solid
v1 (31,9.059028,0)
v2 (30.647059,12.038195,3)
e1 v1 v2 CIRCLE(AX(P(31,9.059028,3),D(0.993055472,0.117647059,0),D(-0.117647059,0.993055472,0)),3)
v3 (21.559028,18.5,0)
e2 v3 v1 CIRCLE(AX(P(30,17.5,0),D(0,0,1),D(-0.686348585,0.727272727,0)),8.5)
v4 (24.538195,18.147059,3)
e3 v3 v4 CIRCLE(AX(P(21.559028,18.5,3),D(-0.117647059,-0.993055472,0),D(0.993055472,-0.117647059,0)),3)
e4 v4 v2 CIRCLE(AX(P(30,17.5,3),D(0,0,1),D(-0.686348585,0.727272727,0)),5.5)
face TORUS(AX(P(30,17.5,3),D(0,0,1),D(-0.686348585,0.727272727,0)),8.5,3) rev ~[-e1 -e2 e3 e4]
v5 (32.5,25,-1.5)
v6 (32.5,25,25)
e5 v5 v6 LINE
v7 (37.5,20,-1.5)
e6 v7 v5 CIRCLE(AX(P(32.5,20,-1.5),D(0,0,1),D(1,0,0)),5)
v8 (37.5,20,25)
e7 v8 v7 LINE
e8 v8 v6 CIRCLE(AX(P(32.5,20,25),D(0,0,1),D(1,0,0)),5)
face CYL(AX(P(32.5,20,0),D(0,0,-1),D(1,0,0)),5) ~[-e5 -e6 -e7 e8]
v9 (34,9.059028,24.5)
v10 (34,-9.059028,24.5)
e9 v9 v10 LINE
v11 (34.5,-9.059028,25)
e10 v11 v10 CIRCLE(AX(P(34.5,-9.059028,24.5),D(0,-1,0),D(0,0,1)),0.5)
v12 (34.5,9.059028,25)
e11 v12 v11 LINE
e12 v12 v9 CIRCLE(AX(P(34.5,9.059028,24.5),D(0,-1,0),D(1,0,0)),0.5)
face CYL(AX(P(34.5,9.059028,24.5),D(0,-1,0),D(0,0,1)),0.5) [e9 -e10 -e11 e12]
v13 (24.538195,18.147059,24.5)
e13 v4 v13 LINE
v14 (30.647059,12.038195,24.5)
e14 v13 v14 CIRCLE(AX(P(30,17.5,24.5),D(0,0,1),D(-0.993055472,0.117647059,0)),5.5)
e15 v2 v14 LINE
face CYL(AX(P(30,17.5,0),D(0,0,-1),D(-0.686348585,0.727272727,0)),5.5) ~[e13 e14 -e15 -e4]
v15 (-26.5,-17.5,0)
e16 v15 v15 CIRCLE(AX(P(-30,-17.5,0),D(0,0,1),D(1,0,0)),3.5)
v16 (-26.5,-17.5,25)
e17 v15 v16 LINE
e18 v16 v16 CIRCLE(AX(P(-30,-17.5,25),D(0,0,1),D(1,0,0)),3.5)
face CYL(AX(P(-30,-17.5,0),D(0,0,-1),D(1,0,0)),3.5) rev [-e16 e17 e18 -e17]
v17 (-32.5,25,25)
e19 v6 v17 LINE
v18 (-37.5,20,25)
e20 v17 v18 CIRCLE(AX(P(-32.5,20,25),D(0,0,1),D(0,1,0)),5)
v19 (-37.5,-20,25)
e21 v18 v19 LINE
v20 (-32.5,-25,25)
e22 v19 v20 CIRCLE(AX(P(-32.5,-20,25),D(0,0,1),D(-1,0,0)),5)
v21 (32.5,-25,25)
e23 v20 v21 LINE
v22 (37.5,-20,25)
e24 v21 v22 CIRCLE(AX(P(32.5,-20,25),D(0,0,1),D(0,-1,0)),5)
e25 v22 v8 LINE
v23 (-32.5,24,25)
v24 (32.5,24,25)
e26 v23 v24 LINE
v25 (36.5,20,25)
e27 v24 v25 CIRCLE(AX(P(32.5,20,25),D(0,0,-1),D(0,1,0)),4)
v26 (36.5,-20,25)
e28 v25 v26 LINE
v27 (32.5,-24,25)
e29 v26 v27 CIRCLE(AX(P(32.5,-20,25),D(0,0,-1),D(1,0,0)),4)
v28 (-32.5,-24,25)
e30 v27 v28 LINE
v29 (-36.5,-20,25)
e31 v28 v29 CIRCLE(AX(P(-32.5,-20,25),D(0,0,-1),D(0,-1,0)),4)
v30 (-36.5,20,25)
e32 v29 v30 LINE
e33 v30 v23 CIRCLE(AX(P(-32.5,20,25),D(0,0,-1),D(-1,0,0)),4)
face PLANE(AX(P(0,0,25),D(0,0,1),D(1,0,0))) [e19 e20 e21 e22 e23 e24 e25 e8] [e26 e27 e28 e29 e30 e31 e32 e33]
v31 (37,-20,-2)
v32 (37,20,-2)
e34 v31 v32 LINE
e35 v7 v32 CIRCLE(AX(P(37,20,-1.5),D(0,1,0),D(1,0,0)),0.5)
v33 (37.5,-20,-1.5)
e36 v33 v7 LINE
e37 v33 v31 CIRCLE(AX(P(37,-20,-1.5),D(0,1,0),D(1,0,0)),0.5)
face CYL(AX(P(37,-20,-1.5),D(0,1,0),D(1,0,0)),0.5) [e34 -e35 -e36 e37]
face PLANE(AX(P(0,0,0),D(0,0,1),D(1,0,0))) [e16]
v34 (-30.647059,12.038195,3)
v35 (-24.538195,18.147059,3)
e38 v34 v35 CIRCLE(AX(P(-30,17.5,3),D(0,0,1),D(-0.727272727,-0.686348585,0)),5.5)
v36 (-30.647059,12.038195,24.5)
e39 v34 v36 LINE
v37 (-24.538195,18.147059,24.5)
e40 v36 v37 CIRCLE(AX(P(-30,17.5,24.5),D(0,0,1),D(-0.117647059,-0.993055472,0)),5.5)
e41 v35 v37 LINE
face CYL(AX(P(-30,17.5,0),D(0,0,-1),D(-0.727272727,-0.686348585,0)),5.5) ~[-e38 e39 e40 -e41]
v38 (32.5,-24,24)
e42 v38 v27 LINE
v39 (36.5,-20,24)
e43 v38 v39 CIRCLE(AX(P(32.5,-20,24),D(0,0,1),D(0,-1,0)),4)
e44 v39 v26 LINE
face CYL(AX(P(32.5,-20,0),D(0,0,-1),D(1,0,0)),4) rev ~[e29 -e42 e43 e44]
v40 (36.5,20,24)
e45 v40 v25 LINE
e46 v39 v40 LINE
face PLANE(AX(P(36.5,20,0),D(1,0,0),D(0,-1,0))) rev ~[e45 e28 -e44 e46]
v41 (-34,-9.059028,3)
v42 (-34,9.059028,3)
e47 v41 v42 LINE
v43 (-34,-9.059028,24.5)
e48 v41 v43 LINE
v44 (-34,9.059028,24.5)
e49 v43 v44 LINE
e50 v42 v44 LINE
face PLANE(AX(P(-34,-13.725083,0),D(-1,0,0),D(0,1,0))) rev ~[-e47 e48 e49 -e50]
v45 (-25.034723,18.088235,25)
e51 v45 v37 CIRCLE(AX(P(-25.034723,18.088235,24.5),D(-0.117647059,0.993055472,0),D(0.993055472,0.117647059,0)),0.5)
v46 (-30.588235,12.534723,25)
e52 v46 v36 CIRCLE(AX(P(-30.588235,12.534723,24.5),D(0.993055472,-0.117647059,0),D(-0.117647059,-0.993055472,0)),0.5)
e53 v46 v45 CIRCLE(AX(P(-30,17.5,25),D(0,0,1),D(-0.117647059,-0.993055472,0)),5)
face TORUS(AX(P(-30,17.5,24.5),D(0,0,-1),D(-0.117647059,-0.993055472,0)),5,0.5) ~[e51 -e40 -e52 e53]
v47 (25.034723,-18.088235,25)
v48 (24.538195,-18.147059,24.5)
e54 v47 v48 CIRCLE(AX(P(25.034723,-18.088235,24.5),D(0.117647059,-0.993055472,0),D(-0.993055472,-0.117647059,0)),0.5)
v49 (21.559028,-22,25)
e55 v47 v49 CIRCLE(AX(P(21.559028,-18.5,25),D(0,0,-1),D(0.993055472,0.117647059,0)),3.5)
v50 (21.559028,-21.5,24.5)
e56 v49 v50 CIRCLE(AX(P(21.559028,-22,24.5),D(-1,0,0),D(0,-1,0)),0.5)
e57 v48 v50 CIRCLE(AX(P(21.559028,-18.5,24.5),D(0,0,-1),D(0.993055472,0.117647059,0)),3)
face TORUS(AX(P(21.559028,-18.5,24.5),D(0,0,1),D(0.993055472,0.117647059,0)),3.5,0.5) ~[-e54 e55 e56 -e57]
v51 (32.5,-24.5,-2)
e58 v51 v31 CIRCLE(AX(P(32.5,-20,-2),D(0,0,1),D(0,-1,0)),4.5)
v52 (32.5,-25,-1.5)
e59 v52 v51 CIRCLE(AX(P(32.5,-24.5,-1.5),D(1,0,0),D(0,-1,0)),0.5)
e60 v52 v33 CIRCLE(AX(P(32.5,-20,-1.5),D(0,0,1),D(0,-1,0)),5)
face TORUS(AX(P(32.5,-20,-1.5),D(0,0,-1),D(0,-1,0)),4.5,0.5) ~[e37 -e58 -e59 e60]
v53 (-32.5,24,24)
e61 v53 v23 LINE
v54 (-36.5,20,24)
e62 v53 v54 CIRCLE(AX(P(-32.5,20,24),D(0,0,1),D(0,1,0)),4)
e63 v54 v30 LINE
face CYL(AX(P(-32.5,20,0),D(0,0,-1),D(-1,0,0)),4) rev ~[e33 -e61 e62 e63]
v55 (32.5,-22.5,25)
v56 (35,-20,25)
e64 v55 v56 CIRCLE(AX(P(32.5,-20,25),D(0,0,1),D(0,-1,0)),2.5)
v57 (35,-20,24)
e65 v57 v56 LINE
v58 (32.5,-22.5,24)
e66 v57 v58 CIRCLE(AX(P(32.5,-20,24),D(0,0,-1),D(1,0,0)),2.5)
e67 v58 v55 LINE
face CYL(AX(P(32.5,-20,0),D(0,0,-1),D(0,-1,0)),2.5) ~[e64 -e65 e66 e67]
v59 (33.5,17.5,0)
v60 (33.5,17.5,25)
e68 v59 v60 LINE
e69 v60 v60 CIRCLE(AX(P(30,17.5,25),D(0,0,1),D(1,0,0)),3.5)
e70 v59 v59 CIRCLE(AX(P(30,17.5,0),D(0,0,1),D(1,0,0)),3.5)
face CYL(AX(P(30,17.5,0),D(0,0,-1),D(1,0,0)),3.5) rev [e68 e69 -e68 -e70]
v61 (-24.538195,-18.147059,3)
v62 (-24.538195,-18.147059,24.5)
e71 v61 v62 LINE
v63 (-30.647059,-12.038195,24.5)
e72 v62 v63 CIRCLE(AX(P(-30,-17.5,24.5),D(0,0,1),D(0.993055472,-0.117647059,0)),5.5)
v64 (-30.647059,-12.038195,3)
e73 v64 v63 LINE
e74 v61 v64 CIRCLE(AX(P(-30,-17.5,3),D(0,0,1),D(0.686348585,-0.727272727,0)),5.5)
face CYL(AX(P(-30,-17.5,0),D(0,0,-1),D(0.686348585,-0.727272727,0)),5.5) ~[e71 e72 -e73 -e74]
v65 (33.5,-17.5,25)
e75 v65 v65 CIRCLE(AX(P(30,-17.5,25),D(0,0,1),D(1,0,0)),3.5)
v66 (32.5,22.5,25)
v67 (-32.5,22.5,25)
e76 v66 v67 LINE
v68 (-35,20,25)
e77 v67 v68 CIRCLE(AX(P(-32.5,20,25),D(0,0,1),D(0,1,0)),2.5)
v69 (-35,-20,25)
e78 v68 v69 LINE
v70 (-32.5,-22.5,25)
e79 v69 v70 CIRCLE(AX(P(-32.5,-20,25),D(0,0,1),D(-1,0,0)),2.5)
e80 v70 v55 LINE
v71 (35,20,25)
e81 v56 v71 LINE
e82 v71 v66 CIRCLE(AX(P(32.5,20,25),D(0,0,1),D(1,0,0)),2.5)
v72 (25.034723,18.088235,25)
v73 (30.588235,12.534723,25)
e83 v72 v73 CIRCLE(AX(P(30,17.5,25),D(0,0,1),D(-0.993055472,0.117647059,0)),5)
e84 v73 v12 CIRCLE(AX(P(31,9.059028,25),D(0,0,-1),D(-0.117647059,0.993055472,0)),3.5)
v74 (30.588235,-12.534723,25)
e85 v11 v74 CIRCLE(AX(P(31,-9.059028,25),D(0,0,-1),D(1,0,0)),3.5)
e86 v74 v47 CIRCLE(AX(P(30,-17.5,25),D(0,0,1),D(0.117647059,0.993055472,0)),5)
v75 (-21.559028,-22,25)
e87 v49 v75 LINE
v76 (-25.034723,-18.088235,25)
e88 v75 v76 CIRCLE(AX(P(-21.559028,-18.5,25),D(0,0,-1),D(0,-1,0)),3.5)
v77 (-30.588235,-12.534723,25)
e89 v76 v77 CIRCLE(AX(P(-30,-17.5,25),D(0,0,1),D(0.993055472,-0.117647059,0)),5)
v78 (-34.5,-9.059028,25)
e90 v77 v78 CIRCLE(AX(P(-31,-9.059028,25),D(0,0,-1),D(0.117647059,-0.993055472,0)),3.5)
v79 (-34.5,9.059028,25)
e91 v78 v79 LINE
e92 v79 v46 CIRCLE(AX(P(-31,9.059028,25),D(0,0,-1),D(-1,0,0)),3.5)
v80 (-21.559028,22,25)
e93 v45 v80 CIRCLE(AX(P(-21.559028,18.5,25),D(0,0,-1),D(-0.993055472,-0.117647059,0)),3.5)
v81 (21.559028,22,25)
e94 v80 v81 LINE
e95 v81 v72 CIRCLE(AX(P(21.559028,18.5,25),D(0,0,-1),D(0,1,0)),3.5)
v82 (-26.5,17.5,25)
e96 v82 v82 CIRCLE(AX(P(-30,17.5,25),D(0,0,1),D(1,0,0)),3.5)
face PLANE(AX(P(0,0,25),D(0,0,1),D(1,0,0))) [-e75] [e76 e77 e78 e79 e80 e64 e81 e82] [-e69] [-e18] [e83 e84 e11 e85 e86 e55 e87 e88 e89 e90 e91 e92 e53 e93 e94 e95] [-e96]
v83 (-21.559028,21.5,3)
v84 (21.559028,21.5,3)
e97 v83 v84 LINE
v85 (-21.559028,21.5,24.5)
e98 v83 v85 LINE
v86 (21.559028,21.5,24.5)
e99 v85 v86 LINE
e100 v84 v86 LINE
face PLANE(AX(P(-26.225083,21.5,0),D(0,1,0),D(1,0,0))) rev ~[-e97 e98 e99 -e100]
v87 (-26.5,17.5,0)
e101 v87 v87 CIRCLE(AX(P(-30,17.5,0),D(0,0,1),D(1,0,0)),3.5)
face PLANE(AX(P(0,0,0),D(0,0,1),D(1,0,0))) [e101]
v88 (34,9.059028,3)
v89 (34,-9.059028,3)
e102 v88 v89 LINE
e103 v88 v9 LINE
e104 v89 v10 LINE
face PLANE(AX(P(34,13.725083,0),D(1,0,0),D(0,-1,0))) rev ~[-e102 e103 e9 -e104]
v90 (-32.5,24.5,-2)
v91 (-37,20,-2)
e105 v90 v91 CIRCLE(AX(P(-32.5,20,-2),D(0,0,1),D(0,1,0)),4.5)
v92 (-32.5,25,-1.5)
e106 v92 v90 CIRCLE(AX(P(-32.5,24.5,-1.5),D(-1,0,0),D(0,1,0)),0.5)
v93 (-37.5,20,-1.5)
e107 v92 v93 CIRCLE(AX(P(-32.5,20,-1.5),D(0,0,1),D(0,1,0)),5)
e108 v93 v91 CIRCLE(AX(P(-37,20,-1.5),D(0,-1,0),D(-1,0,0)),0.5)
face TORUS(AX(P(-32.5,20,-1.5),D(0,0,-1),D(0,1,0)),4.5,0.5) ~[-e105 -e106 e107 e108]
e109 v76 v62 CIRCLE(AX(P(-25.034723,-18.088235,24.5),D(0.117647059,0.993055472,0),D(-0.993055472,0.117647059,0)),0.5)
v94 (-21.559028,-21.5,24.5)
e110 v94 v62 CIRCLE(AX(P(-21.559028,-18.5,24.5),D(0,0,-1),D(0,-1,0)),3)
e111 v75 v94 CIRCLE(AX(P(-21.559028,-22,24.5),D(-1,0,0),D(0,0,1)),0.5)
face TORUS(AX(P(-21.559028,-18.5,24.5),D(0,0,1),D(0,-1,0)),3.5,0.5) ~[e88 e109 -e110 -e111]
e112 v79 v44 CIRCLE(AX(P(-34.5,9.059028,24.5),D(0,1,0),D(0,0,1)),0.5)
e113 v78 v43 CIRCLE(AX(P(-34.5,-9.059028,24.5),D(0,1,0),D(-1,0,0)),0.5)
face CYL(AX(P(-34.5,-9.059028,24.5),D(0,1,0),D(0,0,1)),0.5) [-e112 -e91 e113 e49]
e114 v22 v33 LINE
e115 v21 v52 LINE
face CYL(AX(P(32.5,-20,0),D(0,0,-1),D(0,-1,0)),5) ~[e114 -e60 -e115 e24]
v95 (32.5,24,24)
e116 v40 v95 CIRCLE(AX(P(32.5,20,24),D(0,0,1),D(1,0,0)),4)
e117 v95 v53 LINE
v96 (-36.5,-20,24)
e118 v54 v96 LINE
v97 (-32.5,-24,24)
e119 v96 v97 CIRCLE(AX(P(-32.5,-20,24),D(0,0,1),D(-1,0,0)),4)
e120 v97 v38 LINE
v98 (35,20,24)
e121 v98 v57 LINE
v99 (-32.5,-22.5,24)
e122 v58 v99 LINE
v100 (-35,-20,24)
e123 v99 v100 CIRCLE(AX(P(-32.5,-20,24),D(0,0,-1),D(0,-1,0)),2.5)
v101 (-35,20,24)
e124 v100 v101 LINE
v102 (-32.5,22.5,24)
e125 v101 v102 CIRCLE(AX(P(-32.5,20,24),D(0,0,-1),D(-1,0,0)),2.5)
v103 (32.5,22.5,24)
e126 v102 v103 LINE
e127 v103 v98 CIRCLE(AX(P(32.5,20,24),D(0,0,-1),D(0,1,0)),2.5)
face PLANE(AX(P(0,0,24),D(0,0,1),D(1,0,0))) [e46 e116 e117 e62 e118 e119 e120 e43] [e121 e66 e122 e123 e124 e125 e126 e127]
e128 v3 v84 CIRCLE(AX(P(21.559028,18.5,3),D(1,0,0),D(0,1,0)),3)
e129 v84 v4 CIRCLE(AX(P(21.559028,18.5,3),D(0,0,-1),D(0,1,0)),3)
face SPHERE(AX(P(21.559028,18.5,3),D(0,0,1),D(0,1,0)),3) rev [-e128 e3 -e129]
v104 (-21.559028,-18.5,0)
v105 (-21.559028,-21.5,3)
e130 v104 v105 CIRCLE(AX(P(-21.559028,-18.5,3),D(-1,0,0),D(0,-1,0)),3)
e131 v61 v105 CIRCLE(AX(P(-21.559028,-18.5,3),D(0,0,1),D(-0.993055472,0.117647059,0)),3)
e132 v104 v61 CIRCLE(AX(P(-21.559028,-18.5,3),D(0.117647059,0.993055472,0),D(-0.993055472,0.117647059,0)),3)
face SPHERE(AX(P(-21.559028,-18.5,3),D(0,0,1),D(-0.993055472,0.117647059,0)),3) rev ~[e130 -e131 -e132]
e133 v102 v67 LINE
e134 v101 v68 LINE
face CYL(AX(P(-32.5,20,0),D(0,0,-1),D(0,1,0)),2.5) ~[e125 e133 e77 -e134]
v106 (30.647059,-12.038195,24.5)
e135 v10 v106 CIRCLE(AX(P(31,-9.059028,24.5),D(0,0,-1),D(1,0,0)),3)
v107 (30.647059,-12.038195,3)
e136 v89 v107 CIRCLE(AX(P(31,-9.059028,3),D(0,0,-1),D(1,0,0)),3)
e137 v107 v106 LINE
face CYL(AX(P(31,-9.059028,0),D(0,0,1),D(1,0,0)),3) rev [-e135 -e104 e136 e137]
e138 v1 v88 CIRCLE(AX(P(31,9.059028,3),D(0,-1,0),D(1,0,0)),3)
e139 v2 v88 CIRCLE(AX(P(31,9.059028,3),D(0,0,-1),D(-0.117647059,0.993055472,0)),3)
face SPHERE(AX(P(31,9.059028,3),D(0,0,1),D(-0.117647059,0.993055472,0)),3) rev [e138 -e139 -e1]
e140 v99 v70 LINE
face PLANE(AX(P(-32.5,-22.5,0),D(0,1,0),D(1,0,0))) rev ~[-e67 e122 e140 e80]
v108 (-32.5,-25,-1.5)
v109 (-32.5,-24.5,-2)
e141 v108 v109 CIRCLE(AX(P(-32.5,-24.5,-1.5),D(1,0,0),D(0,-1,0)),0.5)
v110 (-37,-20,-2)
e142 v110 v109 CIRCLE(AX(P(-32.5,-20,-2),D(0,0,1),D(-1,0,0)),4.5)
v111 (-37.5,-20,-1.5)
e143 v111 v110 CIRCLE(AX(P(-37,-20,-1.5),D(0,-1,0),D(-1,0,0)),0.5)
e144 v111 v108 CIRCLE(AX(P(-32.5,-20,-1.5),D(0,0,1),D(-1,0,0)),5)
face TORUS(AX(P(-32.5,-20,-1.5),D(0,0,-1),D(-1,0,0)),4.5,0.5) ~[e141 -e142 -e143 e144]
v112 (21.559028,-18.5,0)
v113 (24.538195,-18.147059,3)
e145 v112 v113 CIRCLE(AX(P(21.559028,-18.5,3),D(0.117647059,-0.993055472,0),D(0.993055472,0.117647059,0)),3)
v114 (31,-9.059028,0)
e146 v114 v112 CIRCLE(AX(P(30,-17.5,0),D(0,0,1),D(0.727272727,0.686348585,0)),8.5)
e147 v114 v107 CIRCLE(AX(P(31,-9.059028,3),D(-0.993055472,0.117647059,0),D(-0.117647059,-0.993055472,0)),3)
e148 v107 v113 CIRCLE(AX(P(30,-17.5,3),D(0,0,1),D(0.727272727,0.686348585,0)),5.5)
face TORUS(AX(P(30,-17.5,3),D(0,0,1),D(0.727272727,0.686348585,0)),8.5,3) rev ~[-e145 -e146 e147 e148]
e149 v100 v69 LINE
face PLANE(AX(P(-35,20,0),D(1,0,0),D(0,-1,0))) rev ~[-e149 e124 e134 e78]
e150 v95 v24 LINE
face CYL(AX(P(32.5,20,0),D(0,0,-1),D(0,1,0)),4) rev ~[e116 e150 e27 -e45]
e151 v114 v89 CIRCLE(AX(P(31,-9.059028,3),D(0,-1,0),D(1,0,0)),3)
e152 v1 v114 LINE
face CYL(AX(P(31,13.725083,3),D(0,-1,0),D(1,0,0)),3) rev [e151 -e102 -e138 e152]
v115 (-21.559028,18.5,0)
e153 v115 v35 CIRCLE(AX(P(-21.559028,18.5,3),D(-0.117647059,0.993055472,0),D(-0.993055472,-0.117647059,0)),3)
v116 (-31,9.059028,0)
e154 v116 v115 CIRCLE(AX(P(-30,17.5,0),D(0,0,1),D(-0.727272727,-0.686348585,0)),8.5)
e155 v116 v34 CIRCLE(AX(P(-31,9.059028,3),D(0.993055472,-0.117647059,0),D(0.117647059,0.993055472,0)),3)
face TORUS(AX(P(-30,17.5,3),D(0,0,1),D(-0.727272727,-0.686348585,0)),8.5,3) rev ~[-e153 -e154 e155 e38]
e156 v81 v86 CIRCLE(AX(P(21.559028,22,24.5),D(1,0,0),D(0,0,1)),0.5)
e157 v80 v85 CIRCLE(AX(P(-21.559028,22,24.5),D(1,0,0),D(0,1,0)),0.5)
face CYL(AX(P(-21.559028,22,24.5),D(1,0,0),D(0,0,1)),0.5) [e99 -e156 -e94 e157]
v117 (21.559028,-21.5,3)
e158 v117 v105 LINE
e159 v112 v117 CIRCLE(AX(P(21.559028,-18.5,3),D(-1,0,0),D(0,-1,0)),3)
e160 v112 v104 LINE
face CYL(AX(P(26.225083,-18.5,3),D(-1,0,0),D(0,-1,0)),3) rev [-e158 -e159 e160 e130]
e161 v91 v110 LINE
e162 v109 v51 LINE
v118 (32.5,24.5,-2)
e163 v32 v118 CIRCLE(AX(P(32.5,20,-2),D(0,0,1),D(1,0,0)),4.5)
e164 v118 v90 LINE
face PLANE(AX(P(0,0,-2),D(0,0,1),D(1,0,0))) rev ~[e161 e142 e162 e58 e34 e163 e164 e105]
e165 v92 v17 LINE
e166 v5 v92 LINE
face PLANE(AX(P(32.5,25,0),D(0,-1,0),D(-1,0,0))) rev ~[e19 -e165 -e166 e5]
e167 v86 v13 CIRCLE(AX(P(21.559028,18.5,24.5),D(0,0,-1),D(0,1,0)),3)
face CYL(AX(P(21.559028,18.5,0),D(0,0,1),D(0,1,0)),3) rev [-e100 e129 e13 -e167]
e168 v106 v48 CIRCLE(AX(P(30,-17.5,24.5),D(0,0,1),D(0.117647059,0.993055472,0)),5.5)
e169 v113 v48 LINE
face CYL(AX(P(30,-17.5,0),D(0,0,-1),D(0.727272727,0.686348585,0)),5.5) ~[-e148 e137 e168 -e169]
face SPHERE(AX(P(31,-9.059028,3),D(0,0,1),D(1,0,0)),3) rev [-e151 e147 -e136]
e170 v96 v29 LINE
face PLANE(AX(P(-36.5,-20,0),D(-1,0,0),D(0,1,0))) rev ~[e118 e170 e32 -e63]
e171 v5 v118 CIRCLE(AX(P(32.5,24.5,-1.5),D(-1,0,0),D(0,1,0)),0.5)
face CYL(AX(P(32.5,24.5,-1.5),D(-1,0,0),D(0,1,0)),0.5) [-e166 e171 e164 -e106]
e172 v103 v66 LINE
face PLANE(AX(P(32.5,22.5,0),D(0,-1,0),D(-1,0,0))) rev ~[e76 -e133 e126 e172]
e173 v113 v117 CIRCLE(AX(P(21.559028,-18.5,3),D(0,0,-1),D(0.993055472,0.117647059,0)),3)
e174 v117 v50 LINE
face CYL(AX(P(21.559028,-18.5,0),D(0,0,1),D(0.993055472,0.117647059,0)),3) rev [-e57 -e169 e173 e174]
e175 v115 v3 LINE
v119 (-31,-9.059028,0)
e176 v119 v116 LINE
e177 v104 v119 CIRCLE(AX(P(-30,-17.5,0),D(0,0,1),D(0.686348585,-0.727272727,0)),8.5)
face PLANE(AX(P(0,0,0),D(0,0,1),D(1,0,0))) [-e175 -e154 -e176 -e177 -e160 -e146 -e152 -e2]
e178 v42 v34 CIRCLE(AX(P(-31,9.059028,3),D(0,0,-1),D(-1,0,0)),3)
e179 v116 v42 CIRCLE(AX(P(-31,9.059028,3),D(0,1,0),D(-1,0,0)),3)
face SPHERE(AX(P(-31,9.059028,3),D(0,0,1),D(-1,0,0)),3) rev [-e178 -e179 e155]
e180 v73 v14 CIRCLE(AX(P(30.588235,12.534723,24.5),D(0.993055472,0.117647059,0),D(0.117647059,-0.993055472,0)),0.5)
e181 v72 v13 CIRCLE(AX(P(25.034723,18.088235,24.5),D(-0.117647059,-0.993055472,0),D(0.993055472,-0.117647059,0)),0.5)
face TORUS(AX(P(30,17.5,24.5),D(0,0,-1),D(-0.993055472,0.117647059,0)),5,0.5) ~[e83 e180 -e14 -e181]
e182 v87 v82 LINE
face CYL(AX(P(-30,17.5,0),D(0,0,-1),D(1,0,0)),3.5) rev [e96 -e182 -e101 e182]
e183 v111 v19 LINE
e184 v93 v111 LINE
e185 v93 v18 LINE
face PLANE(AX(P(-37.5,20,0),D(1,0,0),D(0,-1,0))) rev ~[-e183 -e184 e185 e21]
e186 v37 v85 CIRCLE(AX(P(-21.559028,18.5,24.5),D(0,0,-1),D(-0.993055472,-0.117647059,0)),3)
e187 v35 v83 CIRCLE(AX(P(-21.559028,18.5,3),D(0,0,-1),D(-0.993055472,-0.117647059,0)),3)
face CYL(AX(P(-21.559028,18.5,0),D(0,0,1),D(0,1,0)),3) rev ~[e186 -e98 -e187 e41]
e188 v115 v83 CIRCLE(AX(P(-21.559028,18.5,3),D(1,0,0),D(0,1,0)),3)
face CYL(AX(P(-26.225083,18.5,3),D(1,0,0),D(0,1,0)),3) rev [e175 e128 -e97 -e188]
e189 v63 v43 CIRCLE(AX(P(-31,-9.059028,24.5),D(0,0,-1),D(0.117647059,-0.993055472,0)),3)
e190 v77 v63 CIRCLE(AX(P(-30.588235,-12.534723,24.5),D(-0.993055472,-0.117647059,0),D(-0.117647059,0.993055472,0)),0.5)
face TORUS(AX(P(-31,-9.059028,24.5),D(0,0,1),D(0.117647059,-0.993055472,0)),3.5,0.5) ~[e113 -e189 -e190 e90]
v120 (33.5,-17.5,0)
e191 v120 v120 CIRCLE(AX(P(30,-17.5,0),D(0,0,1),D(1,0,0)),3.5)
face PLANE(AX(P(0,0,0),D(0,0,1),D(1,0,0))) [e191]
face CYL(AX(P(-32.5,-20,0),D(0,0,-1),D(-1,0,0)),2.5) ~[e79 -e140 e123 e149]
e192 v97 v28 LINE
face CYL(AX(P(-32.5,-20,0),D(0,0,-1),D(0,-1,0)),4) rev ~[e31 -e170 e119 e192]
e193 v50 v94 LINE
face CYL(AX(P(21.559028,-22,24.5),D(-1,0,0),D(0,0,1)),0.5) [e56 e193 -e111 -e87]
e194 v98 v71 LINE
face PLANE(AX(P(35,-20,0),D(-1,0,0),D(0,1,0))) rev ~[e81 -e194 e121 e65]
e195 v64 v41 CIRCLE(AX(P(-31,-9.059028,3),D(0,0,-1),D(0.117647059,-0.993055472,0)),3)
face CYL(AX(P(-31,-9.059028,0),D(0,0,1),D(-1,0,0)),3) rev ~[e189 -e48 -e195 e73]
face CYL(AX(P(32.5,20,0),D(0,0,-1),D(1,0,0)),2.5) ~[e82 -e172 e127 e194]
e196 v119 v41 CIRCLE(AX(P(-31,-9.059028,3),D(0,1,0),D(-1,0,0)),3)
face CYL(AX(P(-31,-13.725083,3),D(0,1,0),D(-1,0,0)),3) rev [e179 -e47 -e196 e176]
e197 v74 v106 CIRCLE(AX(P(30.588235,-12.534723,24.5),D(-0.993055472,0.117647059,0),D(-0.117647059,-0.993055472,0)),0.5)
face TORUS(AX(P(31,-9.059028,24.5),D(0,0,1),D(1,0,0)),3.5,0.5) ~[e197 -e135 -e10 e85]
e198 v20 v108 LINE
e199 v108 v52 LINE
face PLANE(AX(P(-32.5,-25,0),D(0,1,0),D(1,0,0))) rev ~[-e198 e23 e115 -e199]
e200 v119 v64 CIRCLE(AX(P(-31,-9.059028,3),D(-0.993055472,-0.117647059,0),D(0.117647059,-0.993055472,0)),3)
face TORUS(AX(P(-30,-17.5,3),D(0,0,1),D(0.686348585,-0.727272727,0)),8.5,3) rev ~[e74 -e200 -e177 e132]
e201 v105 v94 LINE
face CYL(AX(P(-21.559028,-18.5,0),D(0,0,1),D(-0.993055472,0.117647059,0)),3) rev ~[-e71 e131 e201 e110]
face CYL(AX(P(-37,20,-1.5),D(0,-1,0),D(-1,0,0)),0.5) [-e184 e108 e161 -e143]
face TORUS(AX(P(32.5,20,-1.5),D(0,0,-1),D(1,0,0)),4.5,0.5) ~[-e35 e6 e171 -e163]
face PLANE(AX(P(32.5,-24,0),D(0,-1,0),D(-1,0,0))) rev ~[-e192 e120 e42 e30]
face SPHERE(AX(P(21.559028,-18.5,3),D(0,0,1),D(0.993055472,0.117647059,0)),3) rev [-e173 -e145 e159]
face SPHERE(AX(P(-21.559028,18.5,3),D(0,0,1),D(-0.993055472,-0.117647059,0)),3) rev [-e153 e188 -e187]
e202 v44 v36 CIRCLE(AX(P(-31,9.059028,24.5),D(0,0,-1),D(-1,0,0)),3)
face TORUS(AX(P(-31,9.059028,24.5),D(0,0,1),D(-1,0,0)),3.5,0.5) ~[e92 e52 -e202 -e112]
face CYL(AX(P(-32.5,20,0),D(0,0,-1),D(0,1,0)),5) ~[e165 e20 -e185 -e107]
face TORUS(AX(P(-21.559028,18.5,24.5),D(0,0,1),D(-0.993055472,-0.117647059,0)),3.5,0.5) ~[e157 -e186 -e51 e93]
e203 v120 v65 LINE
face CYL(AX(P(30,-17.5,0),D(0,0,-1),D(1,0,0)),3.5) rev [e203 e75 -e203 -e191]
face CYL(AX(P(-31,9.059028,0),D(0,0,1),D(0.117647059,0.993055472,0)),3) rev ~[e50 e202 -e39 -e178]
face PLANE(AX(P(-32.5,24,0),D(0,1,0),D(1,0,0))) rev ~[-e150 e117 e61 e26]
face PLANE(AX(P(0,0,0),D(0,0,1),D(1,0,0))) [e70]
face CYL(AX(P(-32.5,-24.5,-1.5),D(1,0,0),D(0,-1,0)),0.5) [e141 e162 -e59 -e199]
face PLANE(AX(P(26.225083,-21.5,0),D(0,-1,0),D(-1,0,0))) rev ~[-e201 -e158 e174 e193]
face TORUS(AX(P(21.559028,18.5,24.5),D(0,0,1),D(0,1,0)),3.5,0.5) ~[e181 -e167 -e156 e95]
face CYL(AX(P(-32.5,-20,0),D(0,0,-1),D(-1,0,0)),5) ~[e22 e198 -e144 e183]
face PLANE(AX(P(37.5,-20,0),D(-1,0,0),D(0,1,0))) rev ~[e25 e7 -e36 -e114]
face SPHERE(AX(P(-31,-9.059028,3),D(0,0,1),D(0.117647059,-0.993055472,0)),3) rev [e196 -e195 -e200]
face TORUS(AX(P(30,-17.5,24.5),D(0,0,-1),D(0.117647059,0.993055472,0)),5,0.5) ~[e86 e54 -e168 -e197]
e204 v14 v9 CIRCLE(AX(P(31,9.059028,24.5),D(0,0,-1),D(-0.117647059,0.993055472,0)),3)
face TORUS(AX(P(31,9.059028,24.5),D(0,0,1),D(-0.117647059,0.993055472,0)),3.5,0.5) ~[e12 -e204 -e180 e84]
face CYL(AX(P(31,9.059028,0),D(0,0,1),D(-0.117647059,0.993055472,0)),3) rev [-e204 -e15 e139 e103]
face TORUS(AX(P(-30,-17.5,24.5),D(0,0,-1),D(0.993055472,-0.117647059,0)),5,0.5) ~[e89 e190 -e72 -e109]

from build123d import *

# Parameters (mm, degrees)
F0_R     = 3.5
F1_DEPTH = 2
F2_DEPTH = 25
F3_DEPTH = 24
F4_R     = 3
F5_R     = 0.5
F6_R     = 0.5


with BuildPart() as f1:
    # F0 (on Top) → F1 (new body)
    with BuildSketch(Plane.XY):
        with BuildLine():
            ThreePointArc((37.5, 20), (36.0355339059, 23.5355339059), (32.5, 25))
            Line((32.5, 25), (-32.5, 25))
            ThreePointArc((-32.5, 25), (-36.0355339059, 23.5355339059), (-37.5, 20))
            Line((-37.5, 20), (-37.5, -20))
            ThreePointArc((-37.5, -20), (-36.0355339059, -23.5355339059), (-32.5, -25))
            Line((-32.5, -25), (32.5, -25))
            ThreePointArc((32.5, -25), (36.0355339059, -23.5355339059), (37.5, -20))
            Line((37.5, -20), (37.5, 20))
        make_face()
        with BuildLine():
            ThreePointArc((32.5, 24), (35.3284271247, 22.8284271247), (36.5, 20))
            Line((36.5, 20), (36.5, -20))
            ThreePointArc((36.5, -20), (35.3284271247, -22.8284271247), (32.5, -24))
            Line((32.5, -24), (-32.5, -24))
            ThreePointArc((-32.5, -24), (-35.3284271247, -22.8284271247), (-36.5, -20))
            Line((-36.5, -20), (-36.5, 20))
            ThreePointArc((-36.5, 20), (-35.3284271247, 22.8284271247), (-32.5, 24))
            Line((-32.5, 24), (32.5, 24))
        make_face(mode=Mode.SUBTRACT)
        with BuildLine():
            Line((36.5, -20), (36.5, 20))
            ThreePointArc((36.5, 20), (35.3284271247, 22.8284271247), (32.5, 24))
            Line((32.5, 24), (-32.5, 24))
            ThreePointArc((-32.5, 24), (-35.3284271247, 22.8284271247), (-36.5, 20))
            Line((-36.5, 20), (-36.5, -20))
            ThreePointArc((-36.5, -20), (-35.3284271247, -22.8284271247), (-32.5, -24))
            Line((-32.5, -24), (32.5, -24))
            ThreePointArc((32.5, -24), (35.3284271247, -22.8284271247), (36.5, -20))
        make_face()
        with BuildLine():
            ThreePointArc((32.5, 22.5), (34.267766953, 21.767766953), (35, 20))
            Line((35, 20), (35, -20))
            ThreePointArc((35, -20), (34.267766953, -21.767766953), (32.5, -22.5))
            Line((32.5, -22.5), (-32.5, -22.5))
            ThreePointArc((-32.5, -22.5), (-34.267766953, -21.767766953), (-35, -20))
            Line((-35, -20), (-35, 20))
            ThreePointArc((-35, 20), (-34.267766953, 21.767766953), (-32.5, 22.5))
            Line((-32.5, 22.5), (32.5, 22.5))
        make_face(mode=Mode.SUBTRACT)
        with BuildLine():
            Line((35, -20), (35, 20))
            ThreePointArc((35, 20), (34.267766953, 21.767766953), (32.5, 22.5))
            Line((32.5, 22.5), (-32.5, 22.5))
            ThreePointArc((-32.5, 22.5), (-34.267766953, 21.767766953), (-35, 20))
            Line((-35, 20), (-35, -20))
            ThreePointArc((-35, -20), (-34.267766953, -21.767766953), (-32.5, -22.5))
            Line((-32.5, -22.5), (32.5, -22.5))
            ThreePointArc((32.5, -22.5), (34.267766953, -21.767766953), (35, -20))
        make_face()
        with BuildLine():
            ThreePointArc((32.5, 21.5), (33.5606601718, 21.0606601718), (34, 20))
            Line((34, 20), (34, 13.7250827824))
            Line((34, 13.7250827824), (34, -13.7250827824))
            Line((34, -13.7250827824), (34, -20))
            ThreePointArc((34, -20), (33.5606601718, -21.0606601718), (32.5, -21.5))
            Line((32.5, -21.5), (26.2250827824, -21.5))
            Line((26.2250827824, -21.5), (-26.2250827824, -21.5))
            Line((-26.2250827824, -21.5), (-32.5, -21.5))
            ThreePointArc((-32.5, -21.5), (-33.5606601718, -21.0606601718), (-34, -20))
            Line((-34, -20), (-34, -13.7250827824))
            Line((-34, -13.7250827824), (-34, 13.7250827824))
            Line((-34, 13.7250827824), (-34, 20))
            ThreePointArc((-34, 20), (-33.5606601718, 21.0606601718), (-32.5, 21.5))
            Line((-32.5, 21.5), (-26.2250827824, 21.5))
            Line((-26.2250827824, 21.5), (26.2250827824, 21.5))
            Line((26.2250827824, 21.5), (32.5, 21.5))
        make_face(mode=Mode.SUBTRACT)
        with BuildLine():
            Line((34, -13.7250827824), (34, 13.7250827824))
            ThreePointArc((34, 13.7250827824), (26.1109127035, 13.6109127035), (26.2250827824, 21.5))
            Line((26.2250827824, 21.5), (-26.2250827824, 21.5))
            ThreePointArc((-26.2250827824, 21.5), (-26.1109127035, 13.6109127035), (-34, 13.7250827824))
            Line((-34, 13.7250827824), (-34, -13.7250827824))
            ThreePointArc((-34, -13.7250827824), (-26.1109127035, -13.6109127035), (-26.2250827824, -21.5))
            Line((-26.2250827824, -21.5), (26.2250827824, -21.5))
            ThreePointArc((26.2250827824, -21.5), (26.1109127035, -13.6109127035), (34, -13.7250827824))
        make_face()
        with BuildLine():
            Line((34, 13.7250827824), (34, 20))
            ThreePointArc((34, 20), (33.5606601718, 21.0606601718), (32.5, 21.5))
            Line((32.5, 21.5), (26.2250827824, 21.5))
            ThreePointArc((26.2250827824, 21.5), (26.1109127035, 13.6109127035), (34, 13.7250827824))
        make_face()
        with Locations((30, 17.5)):
            Circle(F0_R, mode=Mode.SUBTRACT)
        with BuildLine():
            Line((34, -20), (34, -13.7250827824))
            ThreePointArc((34, -13.7250827824), (26.1109127035, -13.6109127035), (26.2250827824, -21.5))
            Line((26.2250827824, -21.5), (32.5, -21.5))
            ThreePointArc((32.5, -21.5), (33.5606601718, -21.0606601718), (34, -20))
        make_face()
        with Locations((30, -17.5)):
            Circle(F0_R, mode=Mode.SUBTRACT)
        with BuildLine():
            Line((-32.5, -21.5), (-26.2250827824, -21.5))
            ThreePointArc((-26.2250827824, -21.5), (-26.1109127035, -13.6109127035), (-34, -13.7250827824))
            Line((-34, -13.7250827824), (-34, -20))
            ThreePointArc((-34, -20), (-33.5606601718, -21.0606601718), (-32.5, -21.5))
        make_face()
        with Locations((-30, -17.5)):
            Circle(F0_R, mode=Mode.SUBTRACT)
        with BuildLine():
            ThreePointArc((-34, 13.7250827824), (-26.1109127035, 13.6109127035), (-26.2250827824, 21.5))
            Line((-26.2250827824, 21.5), (-32.5, 21.5))
            ThreePointArc((-32.5, 21.5), (-33.5606601718, 21.0606601718), (-34, 20))
            Line((-34, 20), (-34, 13.7250827824))
        make_face()
        with Locations((-30, 17.5)):
            Circle(F0_R, mode=Mode.SUBTRACT)
        with Locations((-30, -17.5)):
            Circle(F0_R)
        with Locations((30, 17.5)):
            Circle(F0_R)
        with Locations((30, -17.5)):
            Circle(F0_R)
        with Locations((-30, 17.5)):
            Circle(F0_R)
    extrude(amount=-F1_DEPTH)

    # F0 (on Top) → F2 (join)
    with BuildSketch(Plane.XY):
        with BuildLine():
            ThreePointArc((37.5, 20), (36.0355339059, 23.5355339059), (32.5, 25))
            Line((32.5, 25), (-32.5, 25))
            ThreePointArc((-32.5, 25), (-36.0355339059, 23.5355339059), (-37.5, 20))
            Line((-37.5, 20), (-37.5, -20))
            ThreePointArc((-37.5, -20), (-36.0355339059, -23.5355339059), (-32.5, -25))
            Line((-32.5, -25), (32.5, -25))
            ThreePointArc((32.5, -25), (36.0355339059, -23.5355339059), (37.5, -20))
            Line((37.5, -20), (37.5, 20))
        make_face()
        with BuildLine():
            ThreePointArc((32.5, 24), (35.3284271247, 22.8284271247), (36.5, 20))
            Line((36.5, 20), (36.5, -20))
            ThreePointArc((36.5, -20), (35.3284271247, -22.8284271247), (32.5, -24))
            Line((32.5, -24), (-32.5, -24))
            ThreePointArc((-32.5, -24), (-35.3284271247, -22.8284271247), (-36.5, -20))
            Line((-36.5, -20), (-36.5, 20))
            ThreePointArc((-36.5, 20), (-35.3284271247, 22.8284271247), (-32.5, 24))
            Line((-32.5, 24), (32.5, 24))
        make_face(mode=Mode.SUBTRACT)
        with BuildLine():
            Line((35, -20), (35, 20))
            ThreePointArc((35, 20), (34.267766953, 21.767766953), (32.5, 22.5))
            Line((32.5, 22.5), (-32.5, 22.5))
            ThreePointArc((-32.5, 22.5), (-34.267766953, 21.767766953), (-35, 20))
            Line((-35, 20), (-35, -20))
            ThreePointArc((-35, -20), (-34.267766953, -21.767766953), (-32.5, -22.5))
            Line((-32.5, -22.5), (32.5, -22.5))
            ThreePointArc((32.5, -22.5), (34.267766953, -21.767766953), (35, -20))
        make_face()
        with BuildLine():
            ThreePointArc((32.5, 21.5), (33.5606601718, 21.0606601718), (34, 20))
            Line((34, 20), (34, 13.7250827824))
            Line((34, 13.7250827824), (34, -13.7250827824))
            Line((34, -13.7250827824), (34, -20))
            ThreePointArc((34, -20), (33.5606601718, -21.0606601718), (32.5, -21.5))
            Line((32.5, -21.5), (26.2250827824, -21.5))
            Line((26.2250827824, -21.5), (-26.2250827824, -21.5))
            Line((-26.2250827824, -21.5), (-32.5, -21.5))
            ThreePointArc((-32.5, -21.5), (-33.5606601718, -21.0606601718), (-34, -20))
            Line((-34, -20), (-34, -13.7250827824))
            Line((-34, -13.7250827824), (-34, 13.7250827824))
            Line((-34, 13.7250827824), (-34, 20))
            ThreePointArc((-34, 20), (-33.5606601718, 21.0606601718), (-32.5, 21.5))
            Line((-32.5, 21.5), (-26.2250827824, 21.5))
            Line((-26.2250827824, 21.5), (26.2250827824, 21.5))
            Line((26.2250827824, 21.5), (32.5, 21.5))
        make_face(mode=Mode.SUBTRACT)
        with BuildLine():
            Line((-32.5, -21.5), (-26.2250827824, -21.5))
            ThreePointArc((-26.2250827824, -21.5), (-26.1109127035, -13.6109127035), (-34, -13.7250827824))
            Line((-34, -13.7250827824), (-34, -20))
            ThreePointArc((-34, -20), (-33.5606601718, -21.0606601718), (-32.5, -21.5))
        make_face()
        with Locations((-30, -17.5)):
            Circle(F0_R, mode=Mode.SUBTRACT)
        with BuildLine():
            Line((34, 13.7250827824), (34, 20))
            ThreePointArc((34, 20), (33.5606601718, 21.0606601718), (32.5, 21.5))
            Line((32.5, 21.5), (26.2250827824, 21.5))
            ThreePointArc((26.2250827824, 21.5), (26.1109127035, 13.6109127035), (34, 13.7250827824))
        make_face()
        with Locations((30, 17.5)):
            Circle(F0_R, mode=Mode.SUBTRACT)
        with BuildLine():
            Line((34, -20), (34, -13.7250827824))
            ThreePointArc((34, -13.7250827824), (26.1109127035, -13.6109127035), (26.2250827824, -21.5))
            Line((26.2250827824, -21.5), (32.5, -21.5))
            ThreePointArc((32.5, -21.5), (33.5606601718, -21.0606601718), (34, -20))
        make_face()
        with Locations((30, -17.5)):
            Circle(F0_R, mode=Mode.SUBTRACT)
        with BuildLine():
            ThreePointArc((-34, 13.7250827824), (-26.1109127035, 13.6109127035), (-26.2250827824, 21.5))
            Line((-26.2250827824, 21.5), (-32.5, 21.5))
            ThreePointArc((-32.5, 21.5), (-33.5606601718, 21.0606601718), (-34, 20))
            Line((-34, 20), (-34, 13.7250827824))
        make_face()
        with Locations((-30, 17.5)):
            Circle(F0_R, mode=Mode.SUBTRACT)
    extrude(amount=F2_DEPTH)

    # F0 (on Top) → F3 (join)
    with BuildSketch(Plane.XY):
        with BuildLine():
            Line((36.5, -20), (36.5, 20))
            ThreePointArc((36.5, 20), (35.3284271247, 22.8284271247), (32.5, 24))
            Line((32.5, 24), (-32.5, 24))
            ThreePointArc((-32.5, 24), (-35.3284271247, 22.8284271247), (-36.5, 20))
            Line((-36.5, 20), (-36.5, -20))
            ThreePointArc((-36.5, -20), (-35.3284271247, -22.8284271247), (-32.5, -24))
            Line((-32.5, -24), (32.5, -24))
            ThreePointArc((32.5, -24), (35.3284271247, -22.8284271247), (36.5, -20))
        make_face()
        with BuildLine():
            ThreePointArc((32.5, 22.5), (34.267766953, 21.767766953), (35, 20))
            Line((35, 20), (35, -20))
            ThreePointArc((35, -20), (34.267766953, -21.767766953), (32.5, -22.5))
            Line((32.5, -22.5), (-32.5, -22.5))
            ThreePointArc((-32.5, -22.5), (-34.267766953, -21.767766953), (-35, -20))
            Line((-35, -20), (-35, 20))
            ThreePointArc((-35, 20), (-34.267766953, 21.767766953), (-32.5, 22.5))
            Line((-32.5, 22.5), (32.5, 22.5))
        make_face(mode=Mode.SUBTRACT)
    extrude(amount=F3_DEPTH)

    # F4
    f4_edges = [f1.edges().sort_by_distance(p)[0] for p in [
        (-26.110913, -13.610913, 0),
        (-34, 0, 0),
        (-26.110913, 13.610913, 0),
        (0, 21.5, 0),
        (26.110913, 13.610913, 0),
        (34, 0, 0),
        (26.110913, -13.610913, 0),
        (0, -21.5, 0),
        (-26.225083, 21.5, 12.5),
        (-34, 13.725083, 12.5),
        (26.225083, 21.5, 12.5),
        (34, 13.725083, 12.5),
        (26.225083, -21.5, 12.5),
        (34, -13.725083, 12.5),
        (-26.225083, -21.5, 12.5),
        (-34, -13.725083, 12.5),
    ]]
    fillet(f4_edges, radius=F4_R)

    # F5
    f5_edges = [f1.edges().sort_by_distance(p)[0] for p in [
        (-26.110913, 13.610913, 25),
    ]]
    fillet(f5_edges, radius=F5_R)

    # F6
    f6_edges = [f1.edges().sort_by_distance(p)[0] for p in [
        (36.035534, -23.535534, -2),
        (37.5, 0, -2),
        (36.035534, 23.535534, -2),
        (0, 25, -2),
        (-36.035534, 23.535534, -2),
        (-37.5, 0, -2),
        (-36.035534, -23.535534, -2),
        (0, -25, -2),
    ]]
    fillet(f6_edges, radius=F6_R)


solid = f1.part
